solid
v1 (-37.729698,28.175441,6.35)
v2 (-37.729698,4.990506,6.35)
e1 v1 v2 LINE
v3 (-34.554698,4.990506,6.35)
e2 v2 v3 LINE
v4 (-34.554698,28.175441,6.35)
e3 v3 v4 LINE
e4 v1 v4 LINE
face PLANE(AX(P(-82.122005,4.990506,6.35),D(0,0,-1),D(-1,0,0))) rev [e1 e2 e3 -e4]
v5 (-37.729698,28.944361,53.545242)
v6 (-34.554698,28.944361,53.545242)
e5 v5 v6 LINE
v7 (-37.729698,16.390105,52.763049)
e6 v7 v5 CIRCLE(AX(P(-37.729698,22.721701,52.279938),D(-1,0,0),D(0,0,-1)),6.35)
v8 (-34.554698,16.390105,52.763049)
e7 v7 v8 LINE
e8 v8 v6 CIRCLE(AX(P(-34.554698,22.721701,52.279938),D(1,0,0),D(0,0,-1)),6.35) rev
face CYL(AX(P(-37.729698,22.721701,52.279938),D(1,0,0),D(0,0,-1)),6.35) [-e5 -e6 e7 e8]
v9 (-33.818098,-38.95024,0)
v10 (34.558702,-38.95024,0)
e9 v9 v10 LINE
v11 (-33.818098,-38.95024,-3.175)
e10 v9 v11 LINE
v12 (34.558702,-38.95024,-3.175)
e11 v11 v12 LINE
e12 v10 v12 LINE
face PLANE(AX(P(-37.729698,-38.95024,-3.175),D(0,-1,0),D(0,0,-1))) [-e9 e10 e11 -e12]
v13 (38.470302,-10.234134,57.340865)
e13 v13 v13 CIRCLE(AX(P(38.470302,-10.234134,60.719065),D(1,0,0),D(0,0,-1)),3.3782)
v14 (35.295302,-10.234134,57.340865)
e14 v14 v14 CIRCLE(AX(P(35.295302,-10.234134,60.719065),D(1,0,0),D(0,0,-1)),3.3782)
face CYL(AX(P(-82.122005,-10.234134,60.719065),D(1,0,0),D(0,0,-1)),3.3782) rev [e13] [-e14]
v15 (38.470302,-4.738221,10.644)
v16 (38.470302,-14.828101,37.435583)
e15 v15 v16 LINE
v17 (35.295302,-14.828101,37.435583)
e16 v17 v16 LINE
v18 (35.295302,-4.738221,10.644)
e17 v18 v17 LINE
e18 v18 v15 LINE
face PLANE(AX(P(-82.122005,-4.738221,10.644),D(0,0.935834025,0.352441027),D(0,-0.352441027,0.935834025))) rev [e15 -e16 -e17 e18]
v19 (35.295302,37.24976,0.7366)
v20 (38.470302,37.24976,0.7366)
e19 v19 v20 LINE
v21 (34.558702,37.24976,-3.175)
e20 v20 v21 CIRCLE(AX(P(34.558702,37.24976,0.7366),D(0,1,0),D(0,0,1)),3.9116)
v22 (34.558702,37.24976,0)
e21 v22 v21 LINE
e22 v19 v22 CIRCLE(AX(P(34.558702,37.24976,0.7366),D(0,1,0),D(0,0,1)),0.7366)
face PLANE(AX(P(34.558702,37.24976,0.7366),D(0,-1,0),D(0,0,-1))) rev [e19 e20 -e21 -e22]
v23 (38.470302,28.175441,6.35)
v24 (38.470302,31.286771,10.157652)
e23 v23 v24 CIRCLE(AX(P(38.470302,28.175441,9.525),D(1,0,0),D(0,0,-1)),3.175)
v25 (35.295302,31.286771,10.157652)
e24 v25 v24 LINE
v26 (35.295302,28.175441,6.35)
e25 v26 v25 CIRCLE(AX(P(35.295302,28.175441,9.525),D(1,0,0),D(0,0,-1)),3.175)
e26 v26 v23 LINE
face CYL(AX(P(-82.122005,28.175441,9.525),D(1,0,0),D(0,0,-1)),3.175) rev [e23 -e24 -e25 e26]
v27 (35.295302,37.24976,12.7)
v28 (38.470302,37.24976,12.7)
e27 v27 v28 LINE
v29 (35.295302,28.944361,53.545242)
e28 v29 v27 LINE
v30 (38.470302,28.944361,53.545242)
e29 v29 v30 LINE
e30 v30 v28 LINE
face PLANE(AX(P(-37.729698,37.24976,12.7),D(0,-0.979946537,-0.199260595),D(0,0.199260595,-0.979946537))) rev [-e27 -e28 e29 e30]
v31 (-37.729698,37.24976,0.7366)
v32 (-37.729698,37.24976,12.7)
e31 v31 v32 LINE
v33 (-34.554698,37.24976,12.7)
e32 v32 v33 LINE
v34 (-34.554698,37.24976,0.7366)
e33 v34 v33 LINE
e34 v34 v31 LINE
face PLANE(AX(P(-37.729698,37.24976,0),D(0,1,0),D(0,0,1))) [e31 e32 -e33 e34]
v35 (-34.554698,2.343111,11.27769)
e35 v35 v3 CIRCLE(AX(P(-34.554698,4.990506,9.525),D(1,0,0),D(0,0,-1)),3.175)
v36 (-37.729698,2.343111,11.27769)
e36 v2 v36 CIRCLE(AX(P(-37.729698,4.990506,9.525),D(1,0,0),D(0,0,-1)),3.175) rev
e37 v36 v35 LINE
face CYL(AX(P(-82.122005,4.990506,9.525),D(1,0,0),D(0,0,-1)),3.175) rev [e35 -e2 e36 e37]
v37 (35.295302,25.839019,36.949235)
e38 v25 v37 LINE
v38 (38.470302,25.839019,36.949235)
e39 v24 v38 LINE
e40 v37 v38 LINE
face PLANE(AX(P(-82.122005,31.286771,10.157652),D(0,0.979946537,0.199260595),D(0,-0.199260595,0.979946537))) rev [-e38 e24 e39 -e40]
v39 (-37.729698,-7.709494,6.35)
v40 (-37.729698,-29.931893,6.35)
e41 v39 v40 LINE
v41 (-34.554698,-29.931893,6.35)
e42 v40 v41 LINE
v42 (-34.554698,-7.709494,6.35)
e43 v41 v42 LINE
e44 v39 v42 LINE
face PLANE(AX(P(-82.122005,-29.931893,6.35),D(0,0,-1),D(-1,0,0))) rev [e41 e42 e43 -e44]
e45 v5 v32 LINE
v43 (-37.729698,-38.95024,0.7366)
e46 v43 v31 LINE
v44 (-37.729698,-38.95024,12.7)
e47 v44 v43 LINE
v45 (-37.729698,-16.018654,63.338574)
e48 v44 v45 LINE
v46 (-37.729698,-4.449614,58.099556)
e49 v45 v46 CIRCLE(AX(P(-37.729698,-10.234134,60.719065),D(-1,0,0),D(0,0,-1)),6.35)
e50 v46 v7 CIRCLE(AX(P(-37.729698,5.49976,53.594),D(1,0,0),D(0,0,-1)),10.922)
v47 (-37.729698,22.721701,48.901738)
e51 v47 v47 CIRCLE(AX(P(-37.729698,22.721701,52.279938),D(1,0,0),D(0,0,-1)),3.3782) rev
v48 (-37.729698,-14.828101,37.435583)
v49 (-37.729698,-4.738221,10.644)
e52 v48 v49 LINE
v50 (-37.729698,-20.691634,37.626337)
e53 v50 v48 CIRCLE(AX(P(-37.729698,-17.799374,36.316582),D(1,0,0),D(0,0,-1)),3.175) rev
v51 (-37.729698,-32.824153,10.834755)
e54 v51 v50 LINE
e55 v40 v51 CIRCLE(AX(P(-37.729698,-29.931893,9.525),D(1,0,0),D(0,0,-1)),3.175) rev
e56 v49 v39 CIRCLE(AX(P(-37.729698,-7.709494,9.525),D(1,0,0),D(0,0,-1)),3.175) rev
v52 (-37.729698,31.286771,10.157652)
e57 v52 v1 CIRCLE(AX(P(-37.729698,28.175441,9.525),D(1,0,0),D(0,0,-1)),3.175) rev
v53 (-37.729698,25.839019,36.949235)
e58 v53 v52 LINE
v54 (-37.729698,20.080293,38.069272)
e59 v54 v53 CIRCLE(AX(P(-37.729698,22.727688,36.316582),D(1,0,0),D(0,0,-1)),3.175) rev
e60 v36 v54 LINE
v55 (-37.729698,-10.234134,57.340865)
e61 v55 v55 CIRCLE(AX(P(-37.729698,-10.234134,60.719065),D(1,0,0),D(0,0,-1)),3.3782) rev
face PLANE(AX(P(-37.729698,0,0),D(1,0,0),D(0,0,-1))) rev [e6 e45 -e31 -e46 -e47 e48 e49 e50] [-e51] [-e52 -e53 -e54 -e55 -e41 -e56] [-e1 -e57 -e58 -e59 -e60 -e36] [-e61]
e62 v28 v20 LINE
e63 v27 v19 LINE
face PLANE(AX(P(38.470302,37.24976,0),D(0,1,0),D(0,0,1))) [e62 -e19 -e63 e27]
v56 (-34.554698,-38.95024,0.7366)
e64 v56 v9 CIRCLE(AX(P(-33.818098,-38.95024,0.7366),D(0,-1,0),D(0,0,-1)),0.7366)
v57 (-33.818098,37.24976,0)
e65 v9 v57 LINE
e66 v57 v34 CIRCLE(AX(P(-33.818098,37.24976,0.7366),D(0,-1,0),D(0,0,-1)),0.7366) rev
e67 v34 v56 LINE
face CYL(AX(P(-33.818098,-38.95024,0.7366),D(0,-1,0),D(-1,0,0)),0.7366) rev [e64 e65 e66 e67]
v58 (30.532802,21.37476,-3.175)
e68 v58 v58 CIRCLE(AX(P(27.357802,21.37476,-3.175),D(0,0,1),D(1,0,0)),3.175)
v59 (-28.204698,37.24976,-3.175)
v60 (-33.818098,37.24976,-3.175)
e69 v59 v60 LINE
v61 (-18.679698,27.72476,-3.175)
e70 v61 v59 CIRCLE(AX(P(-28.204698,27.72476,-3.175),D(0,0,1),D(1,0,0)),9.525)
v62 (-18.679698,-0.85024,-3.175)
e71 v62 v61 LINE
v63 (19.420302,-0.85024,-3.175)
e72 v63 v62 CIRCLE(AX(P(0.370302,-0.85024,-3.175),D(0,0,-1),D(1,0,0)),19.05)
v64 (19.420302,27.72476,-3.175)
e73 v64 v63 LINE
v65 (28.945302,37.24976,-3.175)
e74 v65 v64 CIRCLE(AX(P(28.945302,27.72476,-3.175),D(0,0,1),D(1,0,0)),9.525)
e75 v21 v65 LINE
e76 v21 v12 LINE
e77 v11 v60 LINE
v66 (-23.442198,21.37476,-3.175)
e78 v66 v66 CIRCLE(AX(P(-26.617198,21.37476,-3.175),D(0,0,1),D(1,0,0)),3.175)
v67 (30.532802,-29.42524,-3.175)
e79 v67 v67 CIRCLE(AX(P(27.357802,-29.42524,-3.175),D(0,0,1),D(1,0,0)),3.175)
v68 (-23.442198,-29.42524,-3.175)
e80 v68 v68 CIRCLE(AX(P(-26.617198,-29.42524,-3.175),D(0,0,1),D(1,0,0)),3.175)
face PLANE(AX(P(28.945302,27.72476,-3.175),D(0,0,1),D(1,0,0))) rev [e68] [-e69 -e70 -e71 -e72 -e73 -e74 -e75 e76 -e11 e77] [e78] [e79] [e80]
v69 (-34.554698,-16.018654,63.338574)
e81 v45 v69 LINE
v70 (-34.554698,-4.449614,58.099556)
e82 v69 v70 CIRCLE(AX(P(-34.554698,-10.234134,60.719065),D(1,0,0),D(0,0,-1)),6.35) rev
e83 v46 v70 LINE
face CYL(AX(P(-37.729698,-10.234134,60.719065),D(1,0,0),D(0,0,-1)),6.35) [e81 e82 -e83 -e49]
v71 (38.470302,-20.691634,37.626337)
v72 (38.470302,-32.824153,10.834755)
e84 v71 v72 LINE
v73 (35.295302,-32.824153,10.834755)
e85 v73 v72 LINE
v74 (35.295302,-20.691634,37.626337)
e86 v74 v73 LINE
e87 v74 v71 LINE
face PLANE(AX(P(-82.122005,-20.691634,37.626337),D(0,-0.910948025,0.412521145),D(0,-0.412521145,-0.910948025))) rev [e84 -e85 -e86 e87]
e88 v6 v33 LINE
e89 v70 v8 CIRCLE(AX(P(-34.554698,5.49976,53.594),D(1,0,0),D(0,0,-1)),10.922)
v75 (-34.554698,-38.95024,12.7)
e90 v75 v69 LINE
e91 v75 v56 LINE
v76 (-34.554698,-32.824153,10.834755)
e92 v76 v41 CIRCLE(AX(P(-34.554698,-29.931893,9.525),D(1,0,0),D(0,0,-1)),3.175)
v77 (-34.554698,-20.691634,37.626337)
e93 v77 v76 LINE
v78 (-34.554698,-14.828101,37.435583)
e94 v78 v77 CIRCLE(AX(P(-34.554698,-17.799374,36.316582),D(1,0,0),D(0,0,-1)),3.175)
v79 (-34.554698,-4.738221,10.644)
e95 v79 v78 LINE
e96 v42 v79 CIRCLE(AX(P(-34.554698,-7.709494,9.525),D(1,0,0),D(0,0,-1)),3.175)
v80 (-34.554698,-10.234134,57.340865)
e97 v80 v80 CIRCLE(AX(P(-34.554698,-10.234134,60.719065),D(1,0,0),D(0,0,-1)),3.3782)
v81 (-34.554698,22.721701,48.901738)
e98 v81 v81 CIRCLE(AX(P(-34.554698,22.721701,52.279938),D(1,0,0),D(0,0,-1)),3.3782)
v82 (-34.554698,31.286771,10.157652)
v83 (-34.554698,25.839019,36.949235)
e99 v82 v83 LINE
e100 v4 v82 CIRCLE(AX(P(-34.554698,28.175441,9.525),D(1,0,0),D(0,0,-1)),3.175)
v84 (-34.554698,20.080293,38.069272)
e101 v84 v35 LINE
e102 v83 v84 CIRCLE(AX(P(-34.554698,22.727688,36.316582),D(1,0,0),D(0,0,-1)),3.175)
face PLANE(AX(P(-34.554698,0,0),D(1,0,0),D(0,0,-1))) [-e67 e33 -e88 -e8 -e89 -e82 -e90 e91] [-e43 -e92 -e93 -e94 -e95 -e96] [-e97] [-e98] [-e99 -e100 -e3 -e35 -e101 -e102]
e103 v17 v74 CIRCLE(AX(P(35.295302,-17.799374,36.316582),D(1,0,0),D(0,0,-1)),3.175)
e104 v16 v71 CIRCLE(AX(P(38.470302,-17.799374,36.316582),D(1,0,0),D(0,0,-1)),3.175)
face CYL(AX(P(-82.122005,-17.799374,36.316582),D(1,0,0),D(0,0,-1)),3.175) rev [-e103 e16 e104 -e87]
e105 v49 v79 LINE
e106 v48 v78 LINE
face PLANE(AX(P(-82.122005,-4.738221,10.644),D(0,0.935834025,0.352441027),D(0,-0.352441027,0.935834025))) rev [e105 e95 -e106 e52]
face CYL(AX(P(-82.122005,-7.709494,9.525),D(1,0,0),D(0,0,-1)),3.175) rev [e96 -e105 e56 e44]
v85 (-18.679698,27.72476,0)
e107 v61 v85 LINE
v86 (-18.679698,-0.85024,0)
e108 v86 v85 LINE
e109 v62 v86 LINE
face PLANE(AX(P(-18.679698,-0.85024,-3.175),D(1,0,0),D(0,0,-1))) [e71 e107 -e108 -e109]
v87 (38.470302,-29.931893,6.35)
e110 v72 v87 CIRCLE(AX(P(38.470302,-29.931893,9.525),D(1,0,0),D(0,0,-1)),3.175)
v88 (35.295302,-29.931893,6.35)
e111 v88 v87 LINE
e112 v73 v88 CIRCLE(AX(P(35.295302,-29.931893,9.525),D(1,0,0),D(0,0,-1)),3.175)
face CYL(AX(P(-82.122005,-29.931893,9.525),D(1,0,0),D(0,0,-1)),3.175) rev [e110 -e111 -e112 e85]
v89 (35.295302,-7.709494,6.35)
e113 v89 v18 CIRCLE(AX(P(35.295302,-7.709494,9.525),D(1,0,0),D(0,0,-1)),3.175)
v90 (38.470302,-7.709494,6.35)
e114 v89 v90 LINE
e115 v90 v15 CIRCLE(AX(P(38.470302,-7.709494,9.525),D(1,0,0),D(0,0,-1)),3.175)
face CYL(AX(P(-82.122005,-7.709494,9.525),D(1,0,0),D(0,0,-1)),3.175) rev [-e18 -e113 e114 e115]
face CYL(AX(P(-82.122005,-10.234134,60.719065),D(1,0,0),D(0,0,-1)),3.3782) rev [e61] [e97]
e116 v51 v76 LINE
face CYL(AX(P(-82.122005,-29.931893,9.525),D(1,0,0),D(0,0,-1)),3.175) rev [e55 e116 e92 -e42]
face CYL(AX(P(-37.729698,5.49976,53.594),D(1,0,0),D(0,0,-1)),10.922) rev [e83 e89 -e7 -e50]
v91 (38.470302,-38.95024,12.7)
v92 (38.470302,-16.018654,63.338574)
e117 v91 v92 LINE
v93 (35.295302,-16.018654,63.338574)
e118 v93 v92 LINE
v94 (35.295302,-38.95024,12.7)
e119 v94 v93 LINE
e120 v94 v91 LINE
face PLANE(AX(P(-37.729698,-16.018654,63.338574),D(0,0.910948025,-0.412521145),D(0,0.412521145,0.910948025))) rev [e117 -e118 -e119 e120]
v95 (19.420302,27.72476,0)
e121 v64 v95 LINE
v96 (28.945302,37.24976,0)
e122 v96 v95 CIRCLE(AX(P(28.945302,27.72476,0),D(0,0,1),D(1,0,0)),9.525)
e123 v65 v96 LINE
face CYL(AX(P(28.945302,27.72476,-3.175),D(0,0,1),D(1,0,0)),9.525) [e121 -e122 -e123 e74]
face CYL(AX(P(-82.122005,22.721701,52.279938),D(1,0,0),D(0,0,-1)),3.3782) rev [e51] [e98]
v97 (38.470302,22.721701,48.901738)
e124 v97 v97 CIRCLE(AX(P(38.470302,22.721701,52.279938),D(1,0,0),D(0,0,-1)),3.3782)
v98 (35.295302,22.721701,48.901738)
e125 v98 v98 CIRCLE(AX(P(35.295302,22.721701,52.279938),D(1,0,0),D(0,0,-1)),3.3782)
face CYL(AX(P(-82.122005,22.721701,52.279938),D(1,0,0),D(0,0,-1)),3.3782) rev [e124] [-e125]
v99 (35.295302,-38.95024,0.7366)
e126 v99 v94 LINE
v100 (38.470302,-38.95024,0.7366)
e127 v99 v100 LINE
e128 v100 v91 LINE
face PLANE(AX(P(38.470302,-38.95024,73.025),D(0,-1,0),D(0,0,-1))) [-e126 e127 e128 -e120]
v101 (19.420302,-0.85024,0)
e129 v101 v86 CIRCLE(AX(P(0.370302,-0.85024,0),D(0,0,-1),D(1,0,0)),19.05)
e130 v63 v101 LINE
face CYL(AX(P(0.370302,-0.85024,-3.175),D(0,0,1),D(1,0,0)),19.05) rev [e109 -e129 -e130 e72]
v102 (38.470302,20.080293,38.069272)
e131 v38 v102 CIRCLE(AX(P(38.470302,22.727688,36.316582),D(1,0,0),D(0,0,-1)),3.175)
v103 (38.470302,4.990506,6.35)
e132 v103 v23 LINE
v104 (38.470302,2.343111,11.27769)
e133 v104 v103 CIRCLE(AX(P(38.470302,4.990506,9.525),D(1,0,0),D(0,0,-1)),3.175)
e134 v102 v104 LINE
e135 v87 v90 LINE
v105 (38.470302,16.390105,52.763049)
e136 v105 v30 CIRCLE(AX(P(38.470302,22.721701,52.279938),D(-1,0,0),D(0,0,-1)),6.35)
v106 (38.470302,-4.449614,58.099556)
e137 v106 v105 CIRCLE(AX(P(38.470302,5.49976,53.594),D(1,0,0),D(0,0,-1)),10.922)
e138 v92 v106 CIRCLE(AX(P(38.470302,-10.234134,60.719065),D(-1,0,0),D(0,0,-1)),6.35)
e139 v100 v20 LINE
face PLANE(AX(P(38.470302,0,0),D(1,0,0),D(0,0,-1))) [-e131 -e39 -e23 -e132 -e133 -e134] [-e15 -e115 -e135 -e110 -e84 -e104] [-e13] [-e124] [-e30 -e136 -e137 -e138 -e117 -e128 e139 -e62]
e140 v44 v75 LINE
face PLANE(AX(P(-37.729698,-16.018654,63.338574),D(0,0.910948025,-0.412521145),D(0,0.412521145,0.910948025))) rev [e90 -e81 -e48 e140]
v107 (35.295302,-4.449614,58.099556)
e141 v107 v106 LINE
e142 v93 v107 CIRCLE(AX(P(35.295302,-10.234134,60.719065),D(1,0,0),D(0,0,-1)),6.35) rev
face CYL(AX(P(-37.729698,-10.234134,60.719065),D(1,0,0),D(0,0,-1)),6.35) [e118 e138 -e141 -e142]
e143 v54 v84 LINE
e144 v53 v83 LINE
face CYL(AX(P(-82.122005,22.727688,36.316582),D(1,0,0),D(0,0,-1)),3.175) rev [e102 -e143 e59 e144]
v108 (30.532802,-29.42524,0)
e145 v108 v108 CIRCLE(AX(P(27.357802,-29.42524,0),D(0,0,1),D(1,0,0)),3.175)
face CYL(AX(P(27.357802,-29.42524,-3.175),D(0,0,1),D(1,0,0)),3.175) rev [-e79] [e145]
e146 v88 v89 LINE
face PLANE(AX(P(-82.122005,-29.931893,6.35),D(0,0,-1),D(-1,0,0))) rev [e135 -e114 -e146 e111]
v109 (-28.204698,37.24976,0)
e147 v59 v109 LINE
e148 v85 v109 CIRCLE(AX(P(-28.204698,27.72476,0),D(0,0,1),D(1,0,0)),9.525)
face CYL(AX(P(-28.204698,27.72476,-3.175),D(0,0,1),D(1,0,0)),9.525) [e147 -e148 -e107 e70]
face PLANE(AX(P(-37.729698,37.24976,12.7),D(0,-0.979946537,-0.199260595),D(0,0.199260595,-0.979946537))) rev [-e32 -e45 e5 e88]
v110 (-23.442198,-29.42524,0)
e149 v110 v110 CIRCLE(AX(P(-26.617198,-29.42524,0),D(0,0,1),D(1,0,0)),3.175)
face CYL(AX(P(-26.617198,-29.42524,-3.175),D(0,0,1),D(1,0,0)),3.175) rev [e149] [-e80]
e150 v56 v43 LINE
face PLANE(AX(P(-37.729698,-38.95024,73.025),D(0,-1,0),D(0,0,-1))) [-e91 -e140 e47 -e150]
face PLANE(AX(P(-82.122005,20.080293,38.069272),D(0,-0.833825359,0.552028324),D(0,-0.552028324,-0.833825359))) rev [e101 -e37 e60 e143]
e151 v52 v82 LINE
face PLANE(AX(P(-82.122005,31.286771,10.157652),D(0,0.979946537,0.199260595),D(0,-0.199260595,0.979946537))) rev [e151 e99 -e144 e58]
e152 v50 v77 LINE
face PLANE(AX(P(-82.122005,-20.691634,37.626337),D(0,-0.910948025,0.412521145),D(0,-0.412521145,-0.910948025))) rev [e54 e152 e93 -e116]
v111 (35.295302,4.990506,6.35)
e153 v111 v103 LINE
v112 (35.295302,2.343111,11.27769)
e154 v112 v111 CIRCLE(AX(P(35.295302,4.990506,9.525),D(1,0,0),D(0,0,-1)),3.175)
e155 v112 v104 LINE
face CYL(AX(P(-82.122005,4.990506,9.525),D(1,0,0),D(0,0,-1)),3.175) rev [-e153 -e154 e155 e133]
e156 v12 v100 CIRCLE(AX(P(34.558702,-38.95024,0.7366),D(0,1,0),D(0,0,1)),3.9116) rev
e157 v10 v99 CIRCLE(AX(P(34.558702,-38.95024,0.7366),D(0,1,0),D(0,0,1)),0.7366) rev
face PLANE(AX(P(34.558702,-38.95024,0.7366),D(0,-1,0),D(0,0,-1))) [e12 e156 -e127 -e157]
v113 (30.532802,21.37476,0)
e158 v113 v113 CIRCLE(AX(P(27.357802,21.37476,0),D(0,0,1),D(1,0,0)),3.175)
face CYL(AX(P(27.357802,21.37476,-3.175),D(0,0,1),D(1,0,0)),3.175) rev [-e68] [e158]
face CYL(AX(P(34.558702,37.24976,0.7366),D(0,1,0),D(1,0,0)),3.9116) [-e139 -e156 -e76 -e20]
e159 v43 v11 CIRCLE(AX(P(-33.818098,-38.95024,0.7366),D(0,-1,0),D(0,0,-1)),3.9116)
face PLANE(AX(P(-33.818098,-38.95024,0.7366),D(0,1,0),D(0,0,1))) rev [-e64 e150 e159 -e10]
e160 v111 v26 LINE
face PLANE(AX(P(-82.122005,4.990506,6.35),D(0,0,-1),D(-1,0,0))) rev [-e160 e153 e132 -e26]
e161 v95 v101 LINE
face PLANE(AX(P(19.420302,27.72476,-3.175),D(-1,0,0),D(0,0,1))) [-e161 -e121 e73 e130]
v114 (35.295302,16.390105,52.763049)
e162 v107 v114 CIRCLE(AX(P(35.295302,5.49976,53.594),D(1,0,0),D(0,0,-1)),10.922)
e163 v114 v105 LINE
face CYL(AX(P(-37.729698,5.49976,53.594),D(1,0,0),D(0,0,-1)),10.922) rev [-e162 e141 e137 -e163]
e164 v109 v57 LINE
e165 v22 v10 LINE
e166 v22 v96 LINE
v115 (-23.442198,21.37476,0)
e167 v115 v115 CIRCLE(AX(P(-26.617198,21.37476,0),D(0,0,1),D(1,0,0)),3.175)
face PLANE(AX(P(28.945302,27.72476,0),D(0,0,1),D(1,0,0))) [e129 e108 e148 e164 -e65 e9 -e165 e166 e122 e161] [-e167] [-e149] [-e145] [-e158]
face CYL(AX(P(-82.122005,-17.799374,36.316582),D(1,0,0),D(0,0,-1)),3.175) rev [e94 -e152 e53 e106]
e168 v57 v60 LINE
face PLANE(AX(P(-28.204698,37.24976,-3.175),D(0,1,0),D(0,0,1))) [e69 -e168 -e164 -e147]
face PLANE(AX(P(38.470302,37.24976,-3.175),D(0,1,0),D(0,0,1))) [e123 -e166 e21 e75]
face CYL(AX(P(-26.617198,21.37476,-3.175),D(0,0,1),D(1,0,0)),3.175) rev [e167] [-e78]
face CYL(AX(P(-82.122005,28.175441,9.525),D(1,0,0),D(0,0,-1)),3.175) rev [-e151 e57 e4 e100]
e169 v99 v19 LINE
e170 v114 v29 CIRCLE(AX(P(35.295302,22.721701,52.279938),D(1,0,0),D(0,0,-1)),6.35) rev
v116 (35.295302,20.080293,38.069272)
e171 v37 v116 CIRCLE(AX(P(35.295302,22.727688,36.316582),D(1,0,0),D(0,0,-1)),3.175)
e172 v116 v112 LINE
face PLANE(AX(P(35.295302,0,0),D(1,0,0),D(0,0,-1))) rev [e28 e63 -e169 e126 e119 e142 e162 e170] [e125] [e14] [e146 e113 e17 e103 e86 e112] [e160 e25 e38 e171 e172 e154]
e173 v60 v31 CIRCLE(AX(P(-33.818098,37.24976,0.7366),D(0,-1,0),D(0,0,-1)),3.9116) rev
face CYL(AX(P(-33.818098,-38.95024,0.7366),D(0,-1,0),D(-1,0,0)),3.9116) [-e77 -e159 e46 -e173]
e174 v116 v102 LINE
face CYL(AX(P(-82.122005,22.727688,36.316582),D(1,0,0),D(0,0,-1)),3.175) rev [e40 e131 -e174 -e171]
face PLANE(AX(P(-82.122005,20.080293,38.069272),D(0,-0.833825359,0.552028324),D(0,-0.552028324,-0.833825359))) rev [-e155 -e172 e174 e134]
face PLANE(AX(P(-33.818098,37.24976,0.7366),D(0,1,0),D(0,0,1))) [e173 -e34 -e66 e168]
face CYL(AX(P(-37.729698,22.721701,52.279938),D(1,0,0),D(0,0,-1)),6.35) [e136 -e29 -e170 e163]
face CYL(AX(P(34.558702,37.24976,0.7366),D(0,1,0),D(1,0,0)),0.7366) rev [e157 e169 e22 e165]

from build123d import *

# Parameters (mm, degrees)
SKETCH4_R                      = 3.175
BASE_FLANGE1_DEPTH             = 3.175
EDGE_FLANGE1_STRIP_W           = 14.1732
EDGE_FLANGE1_STRIP_H           = 3.175
EDGE_FLANGE1_STRIP_CUT_DEPTH   = 76.2
EDGE_FLANGE1_STRIP_2_W         = 14.1732
EDGE_FLANGE1_STRIP_2_H         = 3.175
EDGE_FLANGE1_STRIP_CUT_2_DEPTH = 76.2
EDGE_FLANGE1_DEPTH             = 76.2
EDGE_FLANGE1_BEND_DEPTH        = 76.2
CUT_EXTRUDE2_DEPTH             = 113.499830191
CUT_EXTRUDE3_REACH             = 110.728
SKETCH21_R                     = 3.3782


# Sheet-metal steps are written as plain solids
with BuildPart() as part:
    # Sketch4 → Base-Flange1 (new body)
    with BuildSketch(Plane.XY):
        with BuildLine():
            Line((38.470301513, 37.249760359), (28.945301513, 37.249760359))
            ThreePointArc((28.945301513, 37.249760359), (22.210109423, 34.45995245), (19.420301513, 27.724760359))
            Line((19.420301513, 27.724760359), (19.420301513, -0.850239641))
            ThreePointArc((19.420301513, -0.850239641), (0.370301513, -19.900239641), (-18.679698487, -0.850239641))
            Line((-18.679698487, -0.850239641), (-18.679698487, 27.724760359))
            ThreePointArc((-18.679698487, 27.724760359), (-21.469506396, 34.45995245), (-28.204698487, 37.249760359))
            Line((-28.204698487, 37.249760359), (-37.729698487, 37.249760359))
            Line((-37.729698487, 37.249760359), (-37.729698487, -38.950239641))
            Line((-37.729698487, -38.950239641), (38.470301513, -38.950239641))
            Line((38.470301513, -38.950239641), (38.470301513, 37.249760359))
        make_face()
        with Locations((-26.617198487, -29.425239641)):
            Circle(SKETCH4_R, mode=Mode.SUBTRACT)
        with Locations((27.357801513, -29.425239641)):
            Circle(SKETCH4_R, mode=Mode.SUBTRACT)
        with Locations((27.357801513, 21.374760359)):
            Circle(SKETCH4_R, mode=Mode.SUBTRACT)
        with Locations((-26.617198487, 21.374760359)):
            Circle(SKETCH4_R, mode=Mode.SUBTRACT)
    extrude(amount=-BASE_FLANGE1_DEPTH)

    # Edge-Flange1 strip (across the edge) → Edge-Flange1 strip cut (cut)
    with BuildSketch(Plane(origin=(38.470301513, -38.950239641, 0), x_dir=(-1, 0, 0), z_dir=(0, 1, 0))):
        with Locations((-3.175, -1.5875)):
            Rectangle(EDGE_FLANGE1_STRIP_W, EDGE_FLANGE1_STRIP_H)
    extrude(amount=EDGE_FLANGE1_STRIP_CUT_DEPTH, mode=Mode.SUBTRACT)

    # Edge-Flange1 strip 2 (across the edge) → Edge-Flange1 strip cut 2 (cut)
    with BuildSketch(Plane(origin=(-37.729698487, 37.249760359, 0), x_dir=(1, 0, 0), z_dir=(0, -1, 0))):
        with Locations((-3.175, -1.5875)):
            Rectangle(EDGE_FLANGE1_STRIP_2_W, EDGE_FLANGE1_STRIP_2_H)
    extrude(amount=EDGE_FLANGE1_STRIP_CUT_2_DEPTH, mode=Mode.SUBTRACT)

    # Edge-Flange1 section (across the edge) → Edge-Flange1 (add)
    with BuildSketch(Plane(origin=(38.470301513, -38.950239641, 0), x_dir=(-1, 0, 0), z_dir=(0, 1, 0))):
        with BuildLine():
            Line((0, 0.7366), (0, 73.025))
            Line((0, 73.025), (3.175, 73.025))
            Line((3.175, 73.025), (3.175, 0.7366))
            ThreePointArc((3.175, 0.7366), (3.390745145, 0.215745145), (3.9116, 0))
            Line((3.9116, 0), (3.9116, -3.175))
            ThreePointArc((3.9116, -3.175), (1.145681115, -2.029318885), (0, 0.7366))
        make_face()
    extrude(amount=EDGE_FLANGE1_DEPTH)

    # Edge-Flange1 section 2 (across the edge) → Edge-Flange1 bend (add)
    with BuildSketch(Plane(origin=(-37.729698487, 37.249760359, 0), x_dir=(1, 0, 0), z_dir=(0, -1, 0))):
        with BuildLine():
            Line((0, 0.7366), (0, 73.025))
            Line((0, 73.025), (3.175, 73.025))
            Line((3.175, 73.025), (3.175, 0.7366))
            ThreePointArc((3.175, 0.7366), (3.390745145, 0.215745145), (3.9116, 0))
            Line((3.9116, 0), (3.9116, -3.175))
            ThreePointArc((3.9116, -3.175), (1.145681115, -2.029318885), (0, 0.7366))
        make_face()
    extrude(amount=EDGE_FLANGE1_BEND_DEPTH)

    # Sketch18 → Cut-Extrude2 (cut, through all)
    with BuildSketch(Plane(origin=(38.470301513, 0, 0), x_dir=(0, 0, -1), z_dir=(1, 0, 0))):
        with BuildLine():
            Line((-12.7, 37.249760359), (-53.545242344, 28.944361059))
            ThreePointArc((-53.545242344, 28.944361059), (-58.617648241, 22.326829154), (-52.763048756, 16.390104891))
            ThreePointArc((-52.763048756, 16.390104891), (-43.013397441, 2.790344649), (-58.09955595, -4.449613972))
            ThreePointArc((-58.09955595, -4.449613972), (-66.503585183, -7.614624659), (-63.338574497, -16.018653892))
            Line((-63.338574497, -16.018653892), (-12.7, -38.950239641))
            Line((-12.7, -38.950239641), (-73.025, -38.950239641))
            Line((-73.025, -38.950239641), (-73.025, 37.249760359))
            Line((-73.025, 37.249760359), (-12.7, 37.249760359))
        make_face()
    extrude(amount=-CUT_EXTRUDE2_DEPTH, mode=Mode.SUBTRACT)

    # Cut-Extrude3: up to this face of the body (flat: up to its plane)
    cut_extrude3_end = Plane(part.part.faces().sort_by_distance((-37.729698487, 0.375360162, 25.894827333))[0])
    # Sketch21 → Cut-Extrude3 (cut, up to the picked face)
    with BuildSketch(Plane(origin=(38.470301513, 0, 0), x_dir=(0, 0, -1), z_dir=(1, 0, 0)), mode=Mode.PRIVATE) as cut_extrude3_sk1:
        with Locations((-60.719065223, -10.234133932)):
            Circle(SKETCH21_R)
    cut_extrude3_tool1 = split(extrude(cut_extrude3_sk1.sketch, amount=-CUT_EXTRUDE3_REACH, mode=Mode.PRIVATE), bisect_by=cut_extrude3_end, keep=Keep.BOTH, mode=Mode.PRIVATE)
    # Sketch21 → Cut-Extrude3 (cut, up to the picked face)
    with BuildSketch(Plane(origin=(38.470301513, 0, 0), x_dir=(0, 0, -1), z_dir=(1, 0, 0)), mode=Mode.PRIVATE) as cut_extrude3_sk2:
        with Locations((-52.279937568, 22.721700549)):
            Circle(SKETCH21_R)
    cut_extrude3_tool2 = split(extrude(cut_extrude3_sk2.sketch, amount=-CUT_EXTRUDE3_REACH, mode=Mode.PRIVATE), bisect_by=cut_extrude3_end, keep=Keep.BOTH, mode=Mode.PRIVATE)
    # Sketch21 → Cut-Extrude3 (cut, up to the picked face)
    with BuildSketch(Plane(origin=(38.470301513, 0, 0), x_dir=(0, 0, -1), z_dir=(1, 0, 0)), mode=Mode.PRIVATE) as cut_extrude3_sk3:
        with BuildLine():
            Line((-10.64400026, -4.738220863), (-37.435582613, -14.828100623))
            ThreePointArc((-37.435582613, -14.828100623), (-39.489903551, -17.696138128), (-37.62633699, -20.691633633))
            Line((-37.62633699, -20.691633633), (-10.834754637, -32.824152651))
            ThreePointArc((-10.834754637, -32.824152651), (-7.804221974, -32.600140782), (-6.35, -29.931892671))
            Line((-6.35, -29.931892671), (-6.35, -7.709493893))
            ThreePointArc((-6.35, -7.709493893), (-7.718373423, -5.09860795), (-10.64400026, -4.738220863))
        make_face()
    cut_extrude3_tool3 = split(extrude(cut_extrude3_sk3.sketch, amount=-CUT_EXTRUDE3_REACH, mode=Mode.PRIVATE), bisect_by=cut_extrude3_end, keep=Keep.BOTH, mode=Mode.PRIVATE)
    # Sketch21 → Cut-Extrude3 (cut, up to the picked face)
    with BuildSketch(Plane(origin=(38.470301513, 0, 0), x_dir=(0, 0, -1), z_dir=(1, 0, 0)), mode=Mode.PRIVATE) as cut_extrude3_sk4:
        with BuildLine():
            Line((-38.069272281, 20.080292762), (-11.277689928, 2.343110591))
            ThreePointArc((-11.277689928, 2.343110591), (-8.022363238, 2.193595711), (-6.35, 4.990506107))
            Line((-6.35, 4.990506107), (-6.35, 28.175441224))
            ThreePointArc((-6.35, 28.175441224), (-7.516025925, 30.634027844), (-10.157652388, 31.286771479))
            Line((-10.157652388, 31.286771479), (-36.949234742, 25.839018533))
            ThreePointArc((-36.949234742, 25.839018533), (-39.433182282, 23.333848227), (-38.069272281, 20.080292762))
        make_face()
    cut_extrude3_tool4 = split(extrude(cut_extrude3_sk4.sketch, amount=-CUT_EXTRUDE3_REACH, mode=Mode.PRIVATE), bisect_by=cut_extrude3_end, keep=Keep.BOTH, mode=Mode.PRIVATE)
    add(cut_extrude3_tool1.solids().sort_by(Axis((38.470302, -10.234134, 60.719065), (-1, 0, 0)))[0], mode=Mode.SUBTRACT)
    add(cut_extrude3_tool2.solids().sort_by(Axis((38.470302, 22.721701, 52.279938), (-1, 0, 0)))[0], mode=Mode.SUBTRACT)
    add(cut_extrude3_tool3.solids().sort_by(Axis((38.470302, -18.49522, 18.845957), (-1, 0, 0)))[0], mode=Mode.SUBTRACT)
    add(cut_extrude3_tool4.solids().sort_by(Axis((38.470302, 18.532132, 18.821153), (-1, 0, 0)))[0], mode=Mode.SUBTRACT)


solid = part.part
